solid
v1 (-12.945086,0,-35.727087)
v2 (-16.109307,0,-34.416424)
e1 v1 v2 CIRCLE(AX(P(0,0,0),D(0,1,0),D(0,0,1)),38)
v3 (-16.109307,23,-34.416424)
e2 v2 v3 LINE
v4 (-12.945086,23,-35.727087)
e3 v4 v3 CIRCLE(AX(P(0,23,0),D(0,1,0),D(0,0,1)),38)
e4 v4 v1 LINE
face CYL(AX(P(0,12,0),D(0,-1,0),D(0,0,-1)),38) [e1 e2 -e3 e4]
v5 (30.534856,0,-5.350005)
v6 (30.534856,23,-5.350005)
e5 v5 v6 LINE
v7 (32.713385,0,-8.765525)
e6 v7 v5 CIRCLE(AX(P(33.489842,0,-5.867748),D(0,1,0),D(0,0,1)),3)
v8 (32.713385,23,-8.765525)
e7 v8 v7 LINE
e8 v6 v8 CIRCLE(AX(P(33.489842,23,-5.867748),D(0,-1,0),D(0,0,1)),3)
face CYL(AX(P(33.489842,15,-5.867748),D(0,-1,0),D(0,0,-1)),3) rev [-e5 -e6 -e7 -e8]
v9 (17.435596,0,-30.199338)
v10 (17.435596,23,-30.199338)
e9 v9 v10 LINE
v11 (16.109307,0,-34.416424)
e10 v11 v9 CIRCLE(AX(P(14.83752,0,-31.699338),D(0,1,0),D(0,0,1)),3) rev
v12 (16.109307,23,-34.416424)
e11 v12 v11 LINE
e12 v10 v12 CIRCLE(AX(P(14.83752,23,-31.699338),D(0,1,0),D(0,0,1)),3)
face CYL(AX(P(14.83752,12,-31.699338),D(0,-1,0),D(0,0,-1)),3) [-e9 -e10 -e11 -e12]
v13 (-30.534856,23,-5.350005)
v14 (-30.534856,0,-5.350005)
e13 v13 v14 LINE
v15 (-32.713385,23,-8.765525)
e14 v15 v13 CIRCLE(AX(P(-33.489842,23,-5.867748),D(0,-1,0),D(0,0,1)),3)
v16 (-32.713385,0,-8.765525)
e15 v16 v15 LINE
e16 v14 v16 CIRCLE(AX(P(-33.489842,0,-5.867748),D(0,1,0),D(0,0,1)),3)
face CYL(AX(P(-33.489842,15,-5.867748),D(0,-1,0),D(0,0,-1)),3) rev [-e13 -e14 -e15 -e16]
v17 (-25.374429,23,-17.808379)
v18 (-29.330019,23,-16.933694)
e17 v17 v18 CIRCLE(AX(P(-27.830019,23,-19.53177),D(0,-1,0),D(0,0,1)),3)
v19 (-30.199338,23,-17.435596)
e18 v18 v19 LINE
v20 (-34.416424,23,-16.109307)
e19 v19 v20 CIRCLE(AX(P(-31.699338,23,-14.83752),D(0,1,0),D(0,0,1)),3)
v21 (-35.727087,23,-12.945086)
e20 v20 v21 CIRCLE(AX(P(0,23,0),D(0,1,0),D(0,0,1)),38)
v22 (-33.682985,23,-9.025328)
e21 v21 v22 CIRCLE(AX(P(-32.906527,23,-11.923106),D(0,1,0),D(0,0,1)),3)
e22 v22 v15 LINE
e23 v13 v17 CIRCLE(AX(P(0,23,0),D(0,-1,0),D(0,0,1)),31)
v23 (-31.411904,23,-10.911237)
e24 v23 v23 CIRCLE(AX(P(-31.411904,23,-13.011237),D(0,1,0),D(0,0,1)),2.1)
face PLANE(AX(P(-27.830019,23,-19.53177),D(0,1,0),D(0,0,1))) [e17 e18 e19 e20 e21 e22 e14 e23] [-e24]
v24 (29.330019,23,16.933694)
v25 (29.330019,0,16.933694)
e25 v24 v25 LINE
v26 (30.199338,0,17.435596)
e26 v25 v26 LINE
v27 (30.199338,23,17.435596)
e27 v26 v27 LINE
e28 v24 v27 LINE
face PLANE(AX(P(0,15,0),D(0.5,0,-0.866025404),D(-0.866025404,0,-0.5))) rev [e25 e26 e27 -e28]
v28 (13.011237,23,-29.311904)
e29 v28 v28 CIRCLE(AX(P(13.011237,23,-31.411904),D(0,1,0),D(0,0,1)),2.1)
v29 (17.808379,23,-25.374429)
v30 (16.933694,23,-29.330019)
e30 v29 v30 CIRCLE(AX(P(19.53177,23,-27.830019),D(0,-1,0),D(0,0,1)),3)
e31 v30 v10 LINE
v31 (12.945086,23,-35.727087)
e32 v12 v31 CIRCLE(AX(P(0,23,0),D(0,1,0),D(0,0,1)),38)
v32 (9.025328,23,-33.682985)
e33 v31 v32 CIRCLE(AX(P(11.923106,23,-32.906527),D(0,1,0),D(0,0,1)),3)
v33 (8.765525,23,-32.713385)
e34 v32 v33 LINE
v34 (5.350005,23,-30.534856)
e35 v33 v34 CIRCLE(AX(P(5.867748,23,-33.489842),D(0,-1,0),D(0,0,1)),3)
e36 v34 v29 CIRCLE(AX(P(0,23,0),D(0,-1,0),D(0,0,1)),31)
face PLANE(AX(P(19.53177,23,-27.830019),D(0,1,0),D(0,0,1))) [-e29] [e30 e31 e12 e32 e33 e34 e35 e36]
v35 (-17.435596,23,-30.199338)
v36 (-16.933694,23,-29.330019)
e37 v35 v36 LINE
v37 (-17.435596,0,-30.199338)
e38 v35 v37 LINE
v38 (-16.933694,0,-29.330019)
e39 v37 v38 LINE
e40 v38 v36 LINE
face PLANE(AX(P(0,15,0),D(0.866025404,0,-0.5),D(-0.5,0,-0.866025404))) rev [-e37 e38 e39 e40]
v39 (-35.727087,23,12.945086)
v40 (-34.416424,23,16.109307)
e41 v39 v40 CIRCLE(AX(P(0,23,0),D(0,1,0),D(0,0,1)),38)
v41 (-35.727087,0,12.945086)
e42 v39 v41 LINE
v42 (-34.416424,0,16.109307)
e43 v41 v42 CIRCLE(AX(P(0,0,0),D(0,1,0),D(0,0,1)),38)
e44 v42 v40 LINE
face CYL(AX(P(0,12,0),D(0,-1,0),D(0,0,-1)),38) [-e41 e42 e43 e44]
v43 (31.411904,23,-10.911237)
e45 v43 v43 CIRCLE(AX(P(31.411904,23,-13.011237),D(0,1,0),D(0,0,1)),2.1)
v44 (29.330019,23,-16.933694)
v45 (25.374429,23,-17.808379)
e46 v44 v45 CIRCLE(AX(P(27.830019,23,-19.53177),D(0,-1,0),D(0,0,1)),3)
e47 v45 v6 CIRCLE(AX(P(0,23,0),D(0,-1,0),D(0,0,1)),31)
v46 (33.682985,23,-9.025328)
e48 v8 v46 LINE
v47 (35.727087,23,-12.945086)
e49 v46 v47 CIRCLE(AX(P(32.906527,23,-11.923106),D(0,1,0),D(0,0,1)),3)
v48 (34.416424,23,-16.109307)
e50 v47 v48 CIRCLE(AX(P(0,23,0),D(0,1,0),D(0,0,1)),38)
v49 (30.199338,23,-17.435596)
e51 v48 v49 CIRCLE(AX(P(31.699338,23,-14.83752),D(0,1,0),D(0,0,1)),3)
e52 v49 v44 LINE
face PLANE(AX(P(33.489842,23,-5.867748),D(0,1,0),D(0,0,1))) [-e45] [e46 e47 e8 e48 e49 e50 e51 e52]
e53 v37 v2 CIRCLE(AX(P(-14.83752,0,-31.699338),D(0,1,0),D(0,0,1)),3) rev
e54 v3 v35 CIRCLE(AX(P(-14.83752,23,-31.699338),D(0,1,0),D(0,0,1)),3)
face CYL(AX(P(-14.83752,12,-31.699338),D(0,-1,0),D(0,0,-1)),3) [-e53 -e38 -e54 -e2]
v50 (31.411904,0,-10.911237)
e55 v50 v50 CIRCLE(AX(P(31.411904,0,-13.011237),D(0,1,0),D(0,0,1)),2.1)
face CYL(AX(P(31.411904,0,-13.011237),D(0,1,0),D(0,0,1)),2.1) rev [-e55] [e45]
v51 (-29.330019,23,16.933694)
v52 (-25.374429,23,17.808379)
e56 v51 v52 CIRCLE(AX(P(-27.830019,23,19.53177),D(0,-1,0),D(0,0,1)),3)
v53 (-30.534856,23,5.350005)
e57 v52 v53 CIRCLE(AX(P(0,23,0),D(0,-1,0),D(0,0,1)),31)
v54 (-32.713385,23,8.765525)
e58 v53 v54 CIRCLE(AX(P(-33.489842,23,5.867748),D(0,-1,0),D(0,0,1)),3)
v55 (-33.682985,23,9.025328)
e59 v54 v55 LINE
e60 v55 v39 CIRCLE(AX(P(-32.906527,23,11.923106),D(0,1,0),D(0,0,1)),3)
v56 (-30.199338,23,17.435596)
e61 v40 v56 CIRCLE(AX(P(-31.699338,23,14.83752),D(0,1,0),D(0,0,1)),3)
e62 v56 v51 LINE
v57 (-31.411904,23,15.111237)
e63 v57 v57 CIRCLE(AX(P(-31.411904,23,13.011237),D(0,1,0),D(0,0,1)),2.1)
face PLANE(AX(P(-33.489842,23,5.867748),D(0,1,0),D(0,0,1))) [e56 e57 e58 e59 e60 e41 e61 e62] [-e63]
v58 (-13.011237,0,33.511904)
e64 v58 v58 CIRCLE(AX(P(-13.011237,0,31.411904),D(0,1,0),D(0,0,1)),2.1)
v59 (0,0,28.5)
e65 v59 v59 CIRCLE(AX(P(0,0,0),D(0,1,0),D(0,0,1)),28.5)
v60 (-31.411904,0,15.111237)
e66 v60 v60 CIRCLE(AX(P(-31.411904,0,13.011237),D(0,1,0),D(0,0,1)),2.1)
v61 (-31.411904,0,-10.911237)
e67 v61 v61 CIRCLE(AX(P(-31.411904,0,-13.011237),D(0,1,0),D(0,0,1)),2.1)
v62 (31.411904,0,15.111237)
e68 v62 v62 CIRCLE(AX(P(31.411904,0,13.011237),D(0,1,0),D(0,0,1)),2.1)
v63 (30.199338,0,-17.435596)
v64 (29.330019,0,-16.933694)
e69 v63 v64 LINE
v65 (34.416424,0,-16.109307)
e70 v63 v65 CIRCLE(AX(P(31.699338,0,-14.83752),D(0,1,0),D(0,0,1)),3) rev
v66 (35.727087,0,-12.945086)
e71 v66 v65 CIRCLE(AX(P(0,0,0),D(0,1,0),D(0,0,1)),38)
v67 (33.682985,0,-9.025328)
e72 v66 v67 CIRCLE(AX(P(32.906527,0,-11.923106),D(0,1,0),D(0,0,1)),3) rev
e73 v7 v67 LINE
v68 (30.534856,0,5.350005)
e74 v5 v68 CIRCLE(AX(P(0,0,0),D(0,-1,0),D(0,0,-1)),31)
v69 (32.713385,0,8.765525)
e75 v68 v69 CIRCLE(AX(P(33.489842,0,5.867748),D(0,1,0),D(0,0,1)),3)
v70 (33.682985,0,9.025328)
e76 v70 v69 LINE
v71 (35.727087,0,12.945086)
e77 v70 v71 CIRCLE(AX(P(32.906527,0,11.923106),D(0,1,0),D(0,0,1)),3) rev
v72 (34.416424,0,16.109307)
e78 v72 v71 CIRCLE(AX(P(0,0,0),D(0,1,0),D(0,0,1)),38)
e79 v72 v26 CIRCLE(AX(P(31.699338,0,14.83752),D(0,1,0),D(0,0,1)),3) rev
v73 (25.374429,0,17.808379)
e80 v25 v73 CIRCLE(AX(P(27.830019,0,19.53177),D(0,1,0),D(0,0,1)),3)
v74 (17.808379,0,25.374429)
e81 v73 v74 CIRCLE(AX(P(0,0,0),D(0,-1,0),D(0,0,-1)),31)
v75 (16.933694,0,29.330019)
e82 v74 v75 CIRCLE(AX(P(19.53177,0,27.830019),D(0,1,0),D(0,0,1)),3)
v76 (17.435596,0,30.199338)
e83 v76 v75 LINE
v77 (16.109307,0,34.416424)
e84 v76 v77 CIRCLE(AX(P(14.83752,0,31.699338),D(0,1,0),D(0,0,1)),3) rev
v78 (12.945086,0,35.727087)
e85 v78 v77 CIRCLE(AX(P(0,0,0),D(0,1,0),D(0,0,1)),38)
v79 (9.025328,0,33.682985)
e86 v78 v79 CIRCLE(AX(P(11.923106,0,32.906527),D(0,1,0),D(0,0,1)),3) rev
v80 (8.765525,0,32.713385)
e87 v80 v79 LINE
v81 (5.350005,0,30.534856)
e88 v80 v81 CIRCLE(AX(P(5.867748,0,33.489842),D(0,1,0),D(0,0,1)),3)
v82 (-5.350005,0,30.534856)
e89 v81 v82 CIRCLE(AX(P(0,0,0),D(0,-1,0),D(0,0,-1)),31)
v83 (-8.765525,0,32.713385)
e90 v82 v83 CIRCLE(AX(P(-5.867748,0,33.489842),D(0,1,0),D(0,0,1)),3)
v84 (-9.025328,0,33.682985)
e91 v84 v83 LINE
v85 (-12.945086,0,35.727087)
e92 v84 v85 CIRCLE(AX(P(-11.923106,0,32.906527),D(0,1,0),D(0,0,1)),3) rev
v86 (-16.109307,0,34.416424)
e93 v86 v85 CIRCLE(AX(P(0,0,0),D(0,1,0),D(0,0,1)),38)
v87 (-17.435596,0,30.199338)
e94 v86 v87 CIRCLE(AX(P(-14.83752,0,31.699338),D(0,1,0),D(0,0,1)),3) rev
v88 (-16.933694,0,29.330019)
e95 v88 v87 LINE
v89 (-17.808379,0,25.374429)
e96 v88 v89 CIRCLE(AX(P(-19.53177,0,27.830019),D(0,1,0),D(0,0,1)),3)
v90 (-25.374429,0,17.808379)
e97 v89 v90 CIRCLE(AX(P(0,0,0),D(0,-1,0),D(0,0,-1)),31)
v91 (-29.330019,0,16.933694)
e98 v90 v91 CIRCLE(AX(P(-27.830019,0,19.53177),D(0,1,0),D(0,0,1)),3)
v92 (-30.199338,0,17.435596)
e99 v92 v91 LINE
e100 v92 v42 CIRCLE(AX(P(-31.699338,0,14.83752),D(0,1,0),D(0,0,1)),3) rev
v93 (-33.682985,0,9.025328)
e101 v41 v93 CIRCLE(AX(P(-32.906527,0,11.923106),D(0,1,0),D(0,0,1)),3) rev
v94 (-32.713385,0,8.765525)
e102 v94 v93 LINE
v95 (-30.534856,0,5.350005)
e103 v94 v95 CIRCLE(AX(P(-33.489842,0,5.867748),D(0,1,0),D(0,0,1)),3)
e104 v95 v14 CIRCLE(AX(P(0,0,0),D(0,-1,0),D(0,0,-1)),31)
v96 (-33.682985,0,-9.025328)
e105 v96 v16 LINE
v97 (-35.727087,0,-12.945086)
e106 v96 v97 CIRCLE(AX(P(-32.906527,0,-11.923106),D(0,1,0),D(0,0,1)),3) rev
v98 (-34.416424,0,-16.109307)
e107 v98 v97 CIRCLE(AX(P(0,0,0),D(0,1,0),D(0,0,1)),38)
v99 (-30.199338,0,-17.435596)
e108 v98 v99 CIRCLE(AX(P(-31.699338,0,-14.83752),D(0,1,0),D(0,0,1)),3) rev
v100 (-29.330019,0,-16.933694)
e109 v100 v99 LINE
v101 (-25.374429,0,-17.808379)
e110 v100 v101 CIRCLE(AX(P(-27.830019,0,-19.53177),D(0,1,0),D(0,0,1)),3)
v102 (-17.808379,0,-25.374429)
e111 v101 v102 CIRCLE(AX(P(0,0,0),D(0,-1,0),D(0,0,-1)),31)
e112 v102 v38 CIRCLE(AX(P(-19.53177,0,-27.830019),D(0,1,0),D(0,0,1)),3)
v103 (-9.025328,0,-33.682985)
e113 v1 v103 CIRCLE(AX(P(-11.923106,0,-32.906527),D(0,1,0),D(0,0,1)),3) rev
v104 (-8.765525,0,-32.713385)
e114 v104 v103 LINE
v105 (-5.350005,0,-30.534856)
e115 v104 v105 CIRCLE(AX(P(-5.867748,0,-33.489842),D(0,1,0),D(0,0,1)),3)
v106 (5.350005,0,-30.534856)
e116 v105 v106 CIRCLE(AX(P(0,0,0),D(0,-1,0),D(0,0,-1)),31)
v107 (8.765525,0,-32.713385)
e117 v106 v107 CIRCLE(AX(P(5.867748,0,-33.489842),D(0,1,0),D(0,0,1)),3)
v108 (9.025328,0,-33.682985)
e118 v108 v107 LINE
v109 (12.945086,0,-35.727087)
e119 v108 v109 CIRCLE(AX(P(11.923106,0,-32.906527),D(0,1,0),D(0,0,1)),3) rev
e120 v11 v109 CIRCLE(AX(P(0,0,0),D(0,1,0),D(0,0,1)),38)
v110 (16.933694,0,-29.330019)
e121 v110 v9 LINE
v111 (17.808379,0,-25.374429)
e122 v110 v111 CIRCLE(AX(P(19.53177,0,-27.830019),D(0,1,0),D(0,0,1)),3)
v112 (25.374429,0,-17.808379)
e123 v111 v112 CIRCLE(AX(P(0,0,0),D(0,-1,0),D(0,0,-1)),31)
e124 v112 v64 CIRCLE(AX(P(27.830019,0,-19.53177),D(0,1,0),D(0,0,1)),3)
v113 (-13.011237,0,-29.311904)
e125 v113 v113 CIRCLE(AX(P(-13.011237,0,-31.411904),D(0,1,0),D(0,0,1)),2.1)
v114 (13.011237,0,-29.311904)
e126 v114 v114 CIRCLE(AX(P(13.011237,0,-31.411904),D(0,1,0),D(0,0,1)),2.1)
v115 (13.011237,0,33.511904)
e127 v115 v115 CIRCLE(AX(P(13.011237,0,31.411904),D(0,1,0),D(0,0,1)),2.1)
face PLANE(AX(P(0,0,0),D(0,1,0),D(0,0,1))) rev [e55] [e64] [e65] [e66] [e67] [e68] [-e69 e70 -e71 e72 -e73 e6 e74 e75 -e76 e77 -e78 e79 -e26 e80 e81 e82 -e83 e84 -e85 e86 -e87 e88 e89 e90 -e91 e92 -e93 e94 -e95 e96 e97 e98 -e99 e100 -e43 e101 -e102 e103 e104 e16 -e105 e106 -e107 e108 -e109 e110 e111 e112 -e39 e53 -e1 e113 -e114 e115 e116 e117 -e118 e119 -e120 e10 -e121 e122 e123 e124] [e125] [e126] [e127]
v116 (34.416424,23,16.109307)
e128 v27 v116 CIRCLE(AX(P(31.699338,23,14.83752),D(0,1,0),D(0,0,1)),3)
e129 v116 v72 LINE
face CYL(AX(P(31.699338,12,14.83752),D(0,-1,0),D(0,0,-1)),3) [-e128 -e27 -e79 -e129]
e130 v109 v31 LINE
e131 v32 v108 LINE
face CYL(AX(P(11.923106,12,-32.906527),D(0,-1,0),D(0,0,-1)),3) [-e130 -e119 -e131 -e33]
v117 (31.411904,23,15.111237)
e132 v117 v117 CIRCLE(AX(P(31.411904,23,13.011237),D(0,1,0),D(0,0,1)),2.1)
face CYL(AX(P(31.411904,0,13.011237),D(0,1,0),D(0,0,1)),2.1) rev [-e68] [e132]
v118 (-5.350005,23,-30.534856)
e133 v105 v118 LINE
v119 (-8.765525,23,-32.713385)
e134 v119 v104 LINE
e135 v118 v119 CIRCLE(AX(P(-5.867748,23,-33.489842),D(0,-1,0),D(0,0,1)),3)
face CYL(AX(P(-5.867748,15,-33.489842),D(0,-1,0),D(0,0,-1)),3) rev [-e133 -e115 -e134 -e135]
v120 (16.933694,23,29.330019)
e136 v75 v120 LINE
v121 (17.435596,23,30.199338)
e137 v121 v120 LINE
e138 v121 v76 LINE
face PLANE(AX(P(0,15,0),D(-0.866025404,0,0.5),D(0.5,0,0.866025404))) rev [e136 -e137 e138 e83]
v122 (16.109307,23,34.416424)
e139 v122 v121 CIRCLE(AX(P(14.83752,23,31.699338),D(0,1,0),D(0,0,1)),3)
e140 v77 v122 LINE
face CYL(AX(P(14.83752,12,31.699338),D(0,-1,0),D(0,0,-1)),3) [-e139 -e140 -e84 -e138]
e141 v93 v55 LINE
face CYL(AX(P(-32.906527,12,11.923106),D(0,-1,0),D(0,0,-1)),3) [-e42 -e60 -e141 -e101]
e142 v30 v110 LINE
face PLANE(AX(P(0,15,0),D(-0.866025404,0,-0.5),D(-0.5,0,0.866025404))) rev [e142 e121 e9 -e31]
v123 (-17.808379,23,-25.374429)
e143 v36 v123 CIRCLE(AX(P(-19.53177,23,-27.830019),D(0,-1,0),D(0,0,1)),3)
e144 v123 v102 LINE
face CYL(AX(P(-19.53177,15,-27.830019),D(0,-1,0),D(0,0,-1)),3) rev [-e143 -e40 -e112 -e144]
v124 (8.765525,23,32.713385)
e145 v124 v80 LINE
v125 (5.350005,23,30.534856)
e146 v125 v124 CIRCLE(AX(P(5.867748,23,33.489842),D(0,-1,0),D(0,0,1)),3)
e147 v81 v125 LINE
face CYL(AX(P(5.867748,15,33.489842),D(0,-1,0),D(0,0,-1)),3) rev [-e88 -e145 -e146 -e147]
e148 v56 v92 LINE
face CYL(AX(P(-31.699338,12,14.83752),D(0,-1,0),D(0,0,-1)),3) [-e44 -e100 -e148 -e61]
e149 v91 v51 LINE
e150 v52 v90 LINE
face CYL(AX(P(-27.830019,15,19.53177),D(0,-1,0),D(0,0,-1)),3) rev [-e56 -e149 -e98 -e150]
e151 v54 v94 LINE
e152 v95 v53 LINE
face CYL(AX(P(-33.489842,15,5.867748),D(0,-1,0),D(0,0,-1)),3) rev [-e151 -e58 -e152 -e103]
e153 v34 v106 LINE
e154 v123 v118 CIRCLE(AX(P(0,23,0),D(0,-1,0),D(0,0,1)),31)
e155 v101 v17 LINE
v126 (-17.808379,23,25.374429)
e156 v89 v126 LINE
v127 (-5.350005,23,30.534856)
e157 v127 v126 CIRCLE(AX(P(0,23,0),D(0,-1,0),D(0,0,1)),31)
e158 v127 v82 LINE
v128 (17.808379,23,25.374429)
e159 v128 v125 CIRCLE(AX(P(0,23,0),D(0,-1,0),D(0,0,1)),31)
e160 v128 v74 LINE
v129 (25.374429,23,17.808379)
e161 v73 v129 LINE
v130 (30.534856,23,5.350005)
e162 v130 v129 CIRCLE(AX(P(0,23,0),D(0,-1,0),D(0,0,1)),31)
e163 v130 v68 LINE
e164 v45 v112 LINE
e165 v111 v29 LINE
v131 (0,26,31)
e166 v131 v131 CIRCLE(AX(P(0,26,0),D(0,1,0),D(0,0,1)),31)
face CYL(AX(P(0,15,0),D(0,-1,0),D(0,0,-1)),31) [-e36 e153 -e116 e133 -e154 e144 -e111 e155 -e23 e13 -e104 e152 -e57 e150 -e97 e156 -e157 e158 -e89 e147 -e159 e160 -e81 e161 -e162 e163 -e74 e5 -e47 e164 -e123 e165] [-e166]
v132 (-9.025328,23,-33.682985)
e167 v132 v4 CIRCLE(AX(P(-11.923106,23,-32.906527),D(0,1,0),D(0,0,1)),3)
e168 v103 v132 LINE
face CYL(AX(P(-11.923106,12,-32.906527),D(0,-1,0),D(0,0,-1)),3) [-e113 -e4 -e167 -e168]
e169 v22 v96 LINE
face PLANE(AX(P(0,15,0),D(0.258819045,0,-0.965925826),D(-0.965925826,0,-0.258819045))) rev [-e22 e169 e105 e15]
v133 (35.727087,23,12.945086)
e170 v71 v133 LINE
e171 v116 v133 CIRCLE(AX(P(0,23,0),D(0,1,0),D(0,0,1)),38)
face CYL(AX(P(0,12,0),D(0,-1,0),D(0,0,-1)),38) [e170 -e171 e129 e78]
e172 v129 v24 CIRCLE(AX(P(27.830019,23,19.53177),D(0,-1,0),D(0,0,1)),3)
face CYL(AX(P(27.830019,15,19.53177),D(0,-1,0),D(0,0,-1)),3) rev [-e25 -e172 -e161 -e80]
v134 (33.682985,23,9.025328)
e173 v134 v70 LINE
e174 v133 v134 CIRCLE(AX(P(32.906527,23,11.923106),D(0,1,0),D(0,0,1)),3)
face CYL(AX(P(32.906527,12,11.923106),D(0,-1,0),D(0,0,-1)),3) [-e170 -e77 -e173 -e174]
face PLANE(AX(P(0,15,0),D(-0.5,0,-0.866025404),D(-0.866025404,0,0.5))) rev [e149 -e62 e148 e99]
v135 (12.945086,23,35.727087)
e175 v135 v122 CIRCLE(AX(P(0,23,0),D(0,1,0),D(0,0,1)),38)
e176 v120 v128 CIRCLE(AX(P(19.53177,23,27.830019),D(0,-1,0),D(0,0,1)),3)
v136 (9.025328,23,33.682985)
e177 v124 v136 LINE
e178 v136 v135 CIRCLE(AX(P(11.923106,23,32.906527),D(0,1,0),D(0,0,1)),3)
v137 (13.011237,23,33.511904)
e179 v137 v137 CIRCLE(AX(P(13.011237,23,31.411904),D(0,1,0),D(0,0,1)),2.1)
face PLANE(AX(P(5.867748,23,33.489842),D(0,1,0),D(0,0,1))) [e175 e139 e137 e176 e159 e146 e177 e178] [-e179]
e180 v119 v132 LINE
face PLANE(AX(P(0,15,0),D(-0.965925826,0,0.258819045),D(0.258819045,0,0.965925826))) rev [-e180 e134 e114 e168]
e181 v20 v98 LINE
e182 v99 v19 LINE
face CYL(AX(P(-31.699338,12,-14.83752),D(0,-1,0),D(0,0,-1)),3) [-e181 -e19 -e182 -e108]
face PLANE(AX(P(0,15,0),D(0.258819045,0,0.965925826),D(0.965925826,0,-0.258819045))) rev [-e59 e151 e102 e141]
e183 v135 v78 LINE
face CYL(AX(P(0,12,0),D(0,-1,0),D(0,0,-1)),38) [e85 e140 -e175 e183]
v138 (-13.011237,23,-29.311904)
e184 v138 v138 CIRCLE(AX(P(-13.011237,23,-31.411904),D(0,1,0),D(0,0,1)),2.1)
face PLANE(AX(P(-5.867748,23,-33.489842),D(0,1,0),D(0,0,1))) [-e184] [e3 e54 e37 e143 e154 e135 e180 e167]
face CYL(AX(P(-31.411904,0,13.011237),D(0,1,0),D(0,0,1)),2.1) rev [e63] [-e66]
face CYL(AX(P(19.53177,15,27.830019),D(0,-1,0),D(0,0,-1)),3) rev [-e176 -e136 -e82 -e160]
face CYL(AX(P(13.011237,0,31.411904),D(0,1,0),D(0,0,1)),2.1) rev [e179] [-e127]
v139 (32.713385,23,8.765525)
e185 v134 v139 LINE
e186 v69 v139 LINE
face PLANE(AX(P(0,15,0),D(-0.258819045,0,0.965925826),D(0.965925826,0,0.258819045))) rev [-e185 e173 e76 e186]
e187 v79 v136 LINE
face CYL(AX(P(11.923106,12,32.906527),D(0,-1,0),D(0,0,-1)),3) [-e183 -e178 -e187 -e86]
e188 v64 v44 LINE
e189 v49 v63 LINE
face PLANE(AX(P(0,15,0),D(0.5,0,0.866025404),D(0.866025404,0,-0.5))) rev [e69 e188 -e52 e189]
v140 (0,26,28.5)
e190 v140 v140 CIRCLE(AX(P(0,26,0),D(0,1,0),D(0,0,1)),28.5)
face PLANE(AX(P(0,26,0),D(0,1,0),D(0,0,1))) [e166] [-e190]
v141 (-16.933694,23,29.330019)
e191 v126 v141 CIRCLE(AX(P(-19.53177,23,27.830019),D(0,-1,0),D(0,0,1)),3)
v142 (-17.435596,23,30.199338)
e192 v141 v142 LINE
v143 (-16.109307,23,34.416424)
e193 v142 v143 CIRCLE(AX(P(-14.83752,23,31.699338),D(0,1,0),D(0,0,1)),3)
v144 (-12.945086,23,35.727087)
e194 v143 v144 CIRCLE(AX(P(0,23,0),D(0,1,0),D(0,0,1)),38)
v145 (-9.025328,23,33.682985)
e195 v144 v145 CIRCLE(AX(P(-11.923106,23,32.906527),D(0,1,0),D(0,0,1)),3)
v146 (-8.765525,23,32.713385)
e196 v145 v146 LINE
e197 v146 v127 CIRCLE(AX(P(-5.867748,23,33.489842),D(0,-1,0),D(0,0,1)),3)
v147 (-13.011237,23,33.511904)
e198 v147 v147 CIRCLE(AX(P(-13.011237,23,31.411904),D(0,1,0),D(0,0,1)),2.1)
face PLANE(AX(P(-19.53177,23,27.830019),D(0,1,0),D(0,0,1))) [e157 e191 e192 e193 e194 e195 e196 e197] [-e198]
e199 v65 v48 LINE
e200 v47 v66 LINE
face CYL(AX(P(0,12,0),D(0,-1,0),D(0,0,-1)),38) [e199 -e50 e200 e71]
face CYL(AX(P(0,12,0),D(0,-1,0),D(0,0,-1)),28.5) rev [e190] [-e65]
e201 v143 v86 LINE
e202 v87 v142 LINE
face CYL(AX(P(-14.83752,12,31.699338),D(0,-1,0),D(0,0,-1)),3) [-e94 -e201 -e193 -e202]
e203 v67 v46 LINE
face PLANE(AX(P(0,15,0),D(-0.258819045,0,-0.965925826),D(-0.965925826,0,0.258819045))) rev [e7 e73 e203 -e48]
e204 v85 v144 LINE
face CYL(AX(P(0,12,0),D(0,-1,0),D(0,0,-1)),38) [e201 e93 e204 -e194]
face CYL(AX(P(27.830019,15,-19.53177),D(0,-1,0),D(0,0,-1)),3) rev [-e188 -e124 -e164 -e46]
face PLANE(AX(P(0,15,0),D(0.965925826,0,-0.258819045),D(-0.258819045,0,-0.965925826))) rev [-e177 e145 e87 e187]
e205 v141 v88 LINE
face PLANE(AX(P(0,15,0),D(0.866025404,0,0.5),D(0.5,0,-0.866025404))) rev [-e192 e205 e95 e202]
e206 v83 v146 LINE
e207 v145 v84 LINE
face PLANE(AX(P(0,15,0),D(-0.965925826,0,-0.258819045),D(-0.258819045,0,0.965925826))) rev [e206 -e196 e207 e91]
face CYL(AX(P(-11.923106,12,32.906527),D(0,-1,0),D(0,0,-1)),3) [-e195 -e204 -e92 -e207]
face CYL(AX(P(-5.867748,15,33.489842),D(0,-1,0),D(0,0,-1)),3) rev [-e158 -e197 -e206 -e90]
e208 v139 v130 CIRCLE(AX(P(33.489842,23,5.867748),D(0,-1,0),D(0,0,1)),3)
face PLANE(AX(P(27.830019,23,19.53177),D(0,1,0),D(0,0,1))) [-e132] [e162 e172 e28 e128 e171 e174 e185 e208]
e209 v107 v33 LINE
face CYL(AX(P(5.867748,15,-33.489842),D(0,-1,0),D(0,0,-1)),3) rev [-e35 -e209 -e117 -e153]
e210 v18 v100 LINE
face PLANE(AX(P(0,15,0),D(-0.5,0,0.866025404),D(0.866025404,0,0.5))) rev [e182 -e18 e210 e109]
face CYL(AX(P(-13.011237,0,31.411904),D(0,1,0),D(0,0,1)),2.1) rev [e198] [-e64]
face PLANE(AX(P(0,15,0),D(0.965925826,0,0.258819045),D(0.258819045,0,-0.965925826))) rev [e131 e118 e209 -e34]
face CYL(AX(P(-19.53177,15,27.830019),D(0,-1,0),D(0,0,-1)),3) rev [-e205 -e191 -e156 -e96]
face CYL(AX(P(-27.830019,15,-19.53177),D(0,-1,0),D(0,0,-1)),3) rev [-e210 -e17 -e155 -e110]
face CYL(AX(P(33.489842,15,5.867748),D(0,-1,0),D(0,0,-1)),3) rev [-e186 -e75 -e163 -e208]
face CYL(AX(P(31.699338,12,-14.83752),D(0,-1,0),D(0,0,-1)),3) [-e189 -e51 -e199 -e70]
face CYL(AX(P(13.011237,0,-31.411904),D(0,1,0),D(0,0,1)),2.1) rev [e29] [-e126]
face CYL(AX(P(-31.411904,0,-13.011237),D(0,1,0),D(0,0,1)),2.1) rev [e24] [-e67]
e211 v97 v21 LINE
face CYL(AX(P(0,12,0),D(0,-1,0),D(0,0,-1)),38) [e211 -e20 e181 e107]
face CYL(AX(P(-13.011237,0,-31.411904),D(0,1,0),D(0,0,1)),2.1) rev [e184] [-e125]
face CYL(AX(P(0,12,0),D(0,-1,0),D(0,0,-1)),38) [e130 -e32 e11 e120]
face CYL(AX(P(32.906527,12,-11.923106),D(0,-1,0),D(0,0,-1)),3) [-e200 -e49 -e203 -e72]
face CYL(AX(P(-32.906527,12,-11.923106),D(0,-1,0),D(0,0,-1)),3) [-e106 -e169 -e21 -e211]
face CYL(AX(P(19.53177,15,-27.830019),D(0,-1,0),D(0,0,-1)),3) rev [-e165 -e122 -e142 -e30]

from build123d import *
from build123d.topology import SkipClean

# Parameters (mm, degrees)
SKETCH_1_R          = 38
SKETCH_1_R_2        = 28.5
EXTRUDE_1_DEPTH     = 12
SKETCH_2_R          = 2.1
CUT_EXTRUDE_1_DEPTH = 56.063599592
SKETCH_4_R          = 31
SKETCH_4_R_2        = 28.5
EXTRUDE_2_DEPTH     = 3
CUT_EXTRUDE_2_DEPTH = 56.794264938
FILLET_1_R          = 3
EXTRUDE_3_DEPTH     = 11
SKETCH_7_R          = 28.5
EXTRUDE_4_DEPTH     = 11
SKETCH_8_R          = 2.1
CUT_EXTRUDE_3_DEPTH = 58.048728436


with BuildPart() as part:
    # 草图1 → 凸台-拉伸1 (new body)
    with BuildSketch(Plane(origin=(0, 0, 0), x_dir=(1, 0, 0), z_dir=(0, 1, 0))):
        with Locations(Location((0, 0, 0), (0, 0, 270))):
            Circle(SKETCH_1_R)
        with Locations(Location((0, 0, 0), (0, 0, 270))):
            Circle(SKETCH_1_R_2, mode=Mode.SUBTRACT)
    extrude(amount=EXTRUDE_1_DEPTH)

    # 草图2 → 切除-拉伸1 (cut, through all)
    with BuildSketch(Plane(origin=(0, 12, 0), x_dir=(1, 0, 0), z_dir=(0, 1, 0))):
        with Locations(Location((13.0112367, 31.411904105, 0), (0, 0, 270))):
            Circle(SKETCH_2_R)
        with Locations(Location((31.411904105, 13.0112367, 0), (0, 0, 270))):
            Circle(SKETCH_2_R)
        with Locations(Location((31.411904105, -13.0112367, 0), (0, 0, 270))):
            Circle(SKETCH_2_R)
        with Locations(Location((13.0112367, -31.411904105, 0), (0, 0, 270))):
            Circle(SKETCH_2_R)
        with Locations(Location((-13.0112367, -31.411904105, 0), (0, 0, 270))):
            Circle(SKETCH_2_R)
        with Locations(Location((-31.411904105, -13.0112367, 0), (0, 0, 270))):
            Circle(SKETCH_2_R)
        with Locations(Location((-31.411904105, 13.0112367, 0), (0, 0, 270))):
            Circle(SKETCH_2_R)
        with Locations(Location((-13.0112367, 31.411904105, 0), (0, 0, 270))):
            Circle(SKETCH_2_R)
    extrude(amount=-CUT_EXTRUDE_1_DEPTH, mode=Mode.SUBTRACT)

    # 草图4 → 凸台-拉伸2 (add)
    with BuildSketch(Plane(origin=(0, 12, 0), x_dir=(1, 0, 0), z_dir=(0, 1, 0))):
        with Locations(Location((0, 0, 0), (0, 0, 270))):
            Circle(SKETCH_4_R)
        with Locations(Location((0, 0, 0), (0, 0, 270))):
            Circle(SKETCH_4_R_2, mode=Mode.SUBTRACT)
    extrude(amount=EXTRUDE_2_DEPTH)

    # 草图5 → 切除-拉伸2 (cut, through all)
    with BuildSketch(Plane.XZ):
        with BuildLine():
            ThreePointArc((31, 0), (30.734790703, -4.046311959), (29.943700615, -8.023390398))
            Line((29.943700615, -8.023390398), (36.705181399, -9.835123714))
            ThreePointArc((36.705181399, -9.835123714), (37.674904732, -4.959995304), (38, 0))
            ThreePointArc((38, 0), (37.674904732, 4.959995304), (36.705181399, 9.835123714))
            Line((36.705181399, 9.835123714), (29.943700615, 8.023390398))
            ThreePointArc((29.943700615, 8.023390398), (30.734790703, 4.046311959), (31, 0))
        make_face()
        with BuildLine():
            ThreePointArc((15.5, 26.846787517), (21.920310217, 21.920310217), (26.846787517, 15.5))
            Line((26.846787517, 15.5), (32.908965344, 19))
            ThreePointArc((32.908965344, 19), (26.870057685, 26.870057685), (19, 32.908965344))
            Line((19, 32.908965344), (15.5, 26.846787517))
        make_face()
        with BuildLine():
            ThreePointArc((0, 38), (-4.959995304, 37.674904732), (-9.835123714, 36.705181399))
            Line((-9.835123714, 36.705181399), (-8.023390398, 29.943700615))
            ThreePointArc((-8.023390398, 29.943700615), (-4.046311959, 30.734790703), (0, 31))
            Line((0, 31), (0, 38))
        make_face()
        with BuildLine():
            ThreePointArc((9.835123714, 36.705181399), (4.959995304, 37.674904732), (0, 38))
            Line((0, 38), (0, 31))
            ThreePointArc((0, 31), (4.046311959, 30.734790703), (8.023390398, 29.943700615))
            Line((8.023390398, 29.943700615), (9.835123714, 36.705181399))
        make_face()
        with BuildLine():
            Line((-15.5, 26.846787517), (-19, 32.908965344))
            ThreePointArc((-19, 32.908965344), (-26.870057685, 26.870057685), (-32.908965344, 19))
            Line((-32.908965344, 19), (-26.846787517, 15.5))
            ThreePointArc((-26.846787517, 15.5), (-21.920310217, 21.920310217), (-15.5, 26.846787517))
        make_face()
        with BuildLine():
            ThreePointArc((-29.943700615, -8.023390398), (-31, 0), (-29.943700615, 8.023390398))
            Line((-29.943700615, 8.023390398), (-36.705181399, 9.835123714))
            ThreePointArc((-36.705181399, 9.835123714), (-38, 0), (-36.705181399, -9.835123714))
            Line((-36.705181399, -9.835123714), (-29.943700615, -8.023390398))
        make_face()
        with BuildLine():
            ThreePointArc((-15.5, -26.846787517), (-21.920310217, -21.920310217), (-26.846787517, -15.5))
            Line((-26.846787517, -15.5), (-32.908965344, -19))
            ThreePointArc((-32.908965344, -19), (-26.870057685, -26.870057685), (-19, -32.908965344))
            Line((-19, -32.908965344), (-15.5, -26.846787517))
        make_face()
        with BuildLine():
            ThreePointArc((8.023390398, -29.943700615), (0, -31), (-8.023390398, -29.943700615))
            Line((-8.023390398, -29.943700615), (-9.835123714, -36.705181399))
            ThreePointArc((-9.835123714, -36.705181399), (0, -38), (9.835123714, -36.705181399))
            Line((9.835123714, -36.705181399), (8.023390398, -29.943700615))
        make_face()
        with BuildLine():
            ThreePointArc((26.846787517, -15.5), (21.920310217, -21.920310217), (15.5, -26.846787517))
            Line((15.5, -26.846787517), (19, -32.908965344))
            ThreePointArc((19, -32.908965344), (26.870057685, -26.870057685), (32.908965344, -19))
            Line((32.908965344, -19), (26.846787517, -15.5))
        make_face()
    extrude(amount=-CUT_EXTRUDE_2_DEPTH, mode=Mode.SUBTRACT)

    # 圆角1
    # the kernel refuses this fillet: 3 mm, written as the material it adds along each edge
    with BuildSketch(Plane(origin=(15.5, 0, -26.846787517), x_dir=(0.8431001790533391, 0, 0.5377565323454729), z_dir=(0, 1, 0)), Plane(origin=(-8.023390398, 0, -29.943700615), x_dir=(0.9764131444770549, 0, -0.21591056317936408), z_dir=(0, 1, 0)), Plane(origin=(-26.846787517, 0, -15.5), x_dir=(0.5377565323455356, 0, -0.8431001790532991), z_dir=(0, 1, 0)), Plane(origin=(-29.943700615, 0, 8.023390398), x_dir=(-0.21591056317914886, 0, -0.9764131444771023), z_dir=(0, 1, 0)), Plane(origin=(-15.5, 0, 26.846787517), x_dir=(-0.843100179053171, 0, -0.5377565323457362), z_dir=(0, 1, 0)), Plane(origin=(26.846787517, 0, 15.5), x_dir=(-0.5377565323456782, 0, 0.8431001790532081), z_dir=(0, 1, 0)), Plane(origin=(29.943700615, 0, -8.023390398), x_dir=(0.21591056317925006, 0, 0.97641314447708), z_dir=(0, 1, 0))) as fillet_1_piece_1:
        with BuildLine():
            CenterArc((2.870447355, 2.997073318), FILLET_1_R, 182.531046482, 84.937907036)
            Line((-0.126625963, 2.864591132), (0, 0))
            ThreePointArc((0, 0), (1.368982585, 0.030242386), (2.737965169, 0))
        make_face()
    extrude(amount=12)
    with BuildSketch(Plane(origin=(26.846787517, 0, -15.5), x_dir=(-0.5377565323455209, 0, -0.8431001790533084), z_dir=(0, 1, 0)), Plane(origin=(-8.023390398, 0, 29.943700615), x_dir=(0.9764131444771329, 0, 0.21591056317901047), z_dir=(0, 1, 0)), Plane(origin=(15.5, 0, 26.846787517), x_dir=(0.8431001790531747, 0, -0.5377565323457305), z_dir=(0, 1, 0)), Plane(origin=(29.943700615, 0, 8.023390398), x_dir=(0.2159105631791721, 0, -0.9764131444770973), z_dir=(0, 1, 0))) as fillet_1_piece_2:
        with BuildLine():
            CenterArc((2.870447355, -2.997073318), FILLET_1_R, 92.531046482, 84.937907036)
            Line((-0.126625963, -2.864591132), (0, 0))
            ThreePointArc((0, 0), (1.368982585, -0.030242386), (2.737965169, 0))
        make_face()
    extrude(amount=12)
    with BuildSketch(Plane(origin=(8.023390398, 0, -29.943700615), x_dir=(0.2588190451024918, 0, -0.9659258262890761), z_dir=(0, 1, 0)), Plane(origin=(-15.5, 0, -26.846787517), x_dir=(-0.5000000000001898, 0, -0.866025403784329), z_dir=(0, 1, 0)), Plane(origin=(-29.943700615, 0, -8.023390398), x_dir=(-0.9659258262890777, 0, -0.25881904510248516), z_dir=(0, 1, 0)), Plane(origin=(-26.846787517, 0, 15.5), x_dir=(-0.8660254037843256, 0, 0.5000000000001957), z_dir=(0, 1, 0))) as fillet_1_piece_3:
        with BuildLine():
            CenterArc((2.867388444, 3), FILLET_1_R, 185.062092964, 84.937907036)
            ThreePointArc((-0.120910537, 2.735294118), (-0.030242386, 1.368982585), (0, 0))
            Line((0, 0), (2.867388444, 0))
        make_face()
    extrude(amount=12)
    with BuildSketch(Plane(origin=(8.023390398, 0, 29.943700615), x_dir=(0.25881904510250275, 0, 0.9659258262890731), z_dir=(0, 1, 0))) as fillet_1_piece_4:
        with BuildLine():
            CenterArc((2.867388444, -3), FILLET_1_R, 90, 84.937907036)
            ThreePointArc((-0.120910537, -2.735294118), (-0.030242386, -1.368982585), (0, 0))
            Line((0, 0), (2.867388444, 0))
        make_face()
    extrude(amount=12)
    # the kernel refuses this fillet: 3 mm, written as the material it takes off along each edge
    with BuildSketch(Plane(origin=(32.908965344, -8.150359418, -19), x_dir=(0.4623901879594874, 0, 0.8866765555030706), z_dir=(0, 1, 0)), Plane(origin=(9.835123714, -8.150359418, -36.705181399), x_dir=(0.9539342425756279, 0, 0.30001576765507343), z_dir=(0, 1, 0)), Plane(origin=(-19, -8.150359418, -32.908965344), x_dir=(0.8866765555030693, 0, -0.46239018795949005), z_dir=(0, 1, 0)), Plane(origin=(-36.705181399, -8.150359418, -9.835123714), x_dir=(0.30001576765507165, 0, -0.9539342425756285), z_dir=(0, 1, 0)), Plane(origin=(-32.908965344, -8.150359418, 19), x_dir=(-0.4623901879594926, 0, -0.8866765555030679), z_dir=(0, 1, 0)), Plane(origin=(-9.835123714, -8.150359418, 36.705181399), x_dir=(-0.9539342425756258, 0, -0.30001576765508037), z_dir=(0, 1, 0)), Plane(origin=(19, -8.150359418, 32.908965344), x_dir=(-0.886676555503072, 0, 0.46239018795948483), z_dir=(0, 1, 0)), Plane(origin=(36.705181399, -8.150359418, 9.835123714), x_dir=(-0.30001576765507776, 0, 0.9539342425756266), z_dir=(0, 1, 0))) as fillet_1_2_piece_1:
        with BuildLine():
            CenterArc((3.131453882, -2.997238548), FILLET_1_R, 87.541449832, 94.917100336)
            Line((0.134215334, -3.125928434), (0, 0))
            ThreePointArc((0, 0), (1.630071884, 0.034978393), (3.260143767, 0))
        make_face()
    extrude(amount=28.300718837, mode=Mode.SUBTRACT)
    with BuildSketch(Plane(origin=(19, -8.150359418, -32.908965344), x_dir=(-0.49999999999999534, 0, 0.8660254037844413), z_dir=(0, 1, 0)), Plane(origin=(-9.835123714, -8.150359418, -36.705181399), x_dir=(0.2588190451025281, 0, 0.9659258262890663), z_dir=(0, 1, 0)), Plane(origin=(-32.908965344, -8.150359418, -19), x_dir=(0.8660254037844429, 0, 0.4999999999999924), z_dir=(0, 1, 0)), Plane(origin=(-36.705181399, -8.150359418, 9.835123714), x_dir=(0.9659258262890654, 0, -0.2588190451025314), z_dir=(0, 1, 0)), Plane(origin=(-19, -8.150359418, 32.908965344), x_dir=(0.49999999999998923, 0, -0.8660254037844448), z_dir=(0, 1, 0)), Plane(origin=(32.908965344, -8.150359418, 19), x_dir=(-0.8660254037844397, 0, -0.499999999999998), z_dir=(0, 1, 0)), Plane(origin=(36.705181399, -8.150359418, -9.835123714), x_dir=(-0.9659258262890671, 0, 0.25881904510252496), z_dir=(0, 1, 0))) as fillet_1_2_piece_2:
        with BuildLine():
            CenterArc((3.128808452, -3), FILLET_1_R, 90, 94.917100336)
            ThreePointArc((0.139849176, -3.257142857), (0.034978393, -1.630071884), (0, 0))
            Line((0, 0), (3.128808452, 0))
        make_face()
    extrude(amount=28.300718837, mode=Mode.SUBTRACT)
    with BuildSketch(Plane(origin=(9.835123714, -8.150359418, 36.705181399), x_dir=(0.9539342425756233, 0, -0.30001576765508847), z_dir=(0, 1, 0))) as fillet_1_2_piece_3:
        with BuildLine():
            CenterArc((3.131453882, 2.997238548), FILLET_1_R, 177.541449832, 94.917100336)
            Line((0.134215334, 3.125928434), (0, 0))
            ThreePointArc((0, 0), (1.630071884, -0.034978393), (3.260143767, 0))
        make_face()
    extrude(amount=28.300718837, mode=Mode.SUBTRACT)

    # 草图6 → 凸台-拉伸3 (add)
    with SkipClean():  # the faces are left unmerged after this step: merging them gives an invalid solid
        with BuildSketch(Plane(origin=(0, 12, 0), x_dir=(1, 0, 0), z_dir=(0, 1, 0))):
            with BuildLine():
                Line((-16.933694222, -29.330018752), (-17.435595774, -30.199337741))
                ThreePointArc((-17.435595774, -30.199337741), (-17.699322291, -32.599385044), (-16.109306954, -34.416423833))
                ThreePointArc((-16.109306954, -34.416423833), (-14.54197043, -35.107422235), (-12.945086489, -35.727086864))
                ThreePointArc((-12.945086489, -35.727086864), (-10.535935413, -35.566557041), (-9.025328498, -33.68298451))
                Line((-9.025328498, -33.68298451), (-8.765525137, -32.713385167))
                ThreePointArc((-8.765525137, -32.713385167), (-7.481017255, -30.960541765), (-5.350005218, -30.534856217))
                ThreePointArc((-5.350005218, -30.534856217), (-11.863186403, -28.640265508), (-17.808378924, -25.374428862))
                ThreePointArc((-17.808378924, -25.374428862), (-16.602531, -27.182287063), (-16.933694222, -29.330018752))
            make_face()
            with BuildLine():
                Line((-32.713385167, -8.765525137), (-33.68298451, -9.025328498))
                ThreePointArc((-33.68298451, -9.025328498), (-35.566557041, -10.535935413), (-35.727086864, -12.945086489))
                ThreePointArc((-35.727086864, -12.945086489), (-35.107422235, -14.54197043), (-34.416423833, -16.109306954))
                ThreePointArc((-34.416423833, -16.109306954), (-32.599385044, -17.699322291), (-30.199337741, -17.435595774))
                Line((-30.199337741, -17.435595774), (-29.330018752, -16.933694222))
                ThreePointArc((-29.330018752, -16.933694222), (-27.182287063, -16.602531), (-25.374428862, -17.808378924))
                ThreePointArc((-25.374428862, -17.808378924), (-28.640265508, -11.863186403), (-30.534856217, -5.350005218))
                ThreePointArc((-30.534856217, -5.350005218), (-30.960541765, -7.481017255), (-32.713385167, -8.765525137))
            make_face()
            with BuildLine():
                Line((-29.330018752, 16.933694222), (-30.199337741, 17.435595774))
                ThreePointArc((-30.199337741, 17.435595774), (-32.599385044, 17.699322291), (-34.416423833, 16.109306954))
                ThreePointArc((-34.416423833, 16.109306954), (-35.107422235, 14.54197043), (-35.727086864, 12.945086489))
                ThreePointArc((-35.727086864, 12.945086489), (-35.566557041, 10.535935413), (-33.68298451, 9.025328498))
                Line((-33.68298451, 9.025328498), (-32.713385167, 8.765525137))
                ThreePointArc((-32.713385167, 8.765525137), (-30.960541765, 7.481017255), (-30.534856217, 5.350005218))
                ThreePointArc((-30.534856217, 5.350005218), (-28.640265508, 11.863186403), (-25.374428862, 17.808378924))
                ThreePointArc((-25.374428862, 17.808378924), (-27.182287063, 16.602531), (-29.330018752, 16.933694222))
            make_face()
            with BuildLine():
                Line((-8.765525137, 32.713385167), (-9.025328498, 33.68298451))
                ThreePointArc((-9.025328498, 33.68298451), (-10.535935413, 35.566557041), (-12.945086489, 35.727086864))
                ThreePointArc((-12.945086489, 35.727086864), (-14.54197043, 35.107422235), (-16.109306954, 34.416423833))
                ThreePointArc((-16.109306954, 34.416423833), (-17.699322291, 32.599385044), (-17.435595774, 30.199337741))
                Line((-17.435595774, 30.199337741), (-16.933694222, 29.330018752))
                ThreePointArc((-16.933694222, 29.330018752), (-16.602531, 27.182287063), (-17.808378924, 25.374428862))
                ThreePointArc((-17.808378924, 25.374428862), (-11.863186403, 28.640265508), (-5.350005218, 30.534856217))
                ThreePointArc((-5.350005218, 30.534856217), (-7.481017255, 30.960541765), (-8.765525137, 32.713385167))
            make_face()
            with BuildLine():
                Line((16.933694222, 29.330018752), (17.435595774, 30.199337741))
                ThreePointArc((17.435595774, 30.199337741), (17.699322291, 32.599385044), (16.109306954, 34.416423833))
                ThreePointArc((16.109306954, 34.416423833), (14.54197043, 35.107422235), (12.945086489, 35.727086864))
                ThreePointArc((12.945086489, 35.727086864), (10.535935413, 35.566557041), (9.025328498, 33.68298451))
                Line((9.025328498, 33.68298451), (8.765525137, 32.713385167))
                ThreePointArc((8.765525137, 32.713385167), (7.481017255, 30.960541765), (5.350005218, 30.534856217))
                ThreePointArc((5.350005218, 30.534856217), (11.863186403, 28.640265508), (17.808378924, 25.374428862))
                ThreePointArc((17.808378924, 25.374428862), (16.602531, 27.182287063), (16.933694222, 29.330018752))
            make_face()
            with BuildLine():
                Line((32.713385167, 8.765525137), (33.68298451, 9.025328498))
                ThreePointArc((33.68298451, 9.025328498), (35.566557041, 10.535935413), (35.727086864, 12.945086489))
                ThreePointArc((35.727086864, 12.945086489), (35.107422235, 14.54197043), (34.416423833, 16.109306954))
                ThreePointArc((34.416423833, 16.109306954), (32.599385044, 17.699322291), (30.199337741, 17.435595774))
                Line((30.199337741, 17.435595774), (29.330018752, 16.933694222))
                ThreePointArc((29.330018752, 16.933694222), (27.182287063, 16.602531), (25.374428862, 17.808378924))
                ThreePointArc((25.374428862, 17.808378924), (28.640265508, 11.863186403), (30.534856217, 5.350005218))
                ThreePointArc((30.534856217, 5.350005218), (30.960541765, 7.481017255), (32.713385167, 8.765525137))
            make_face()
            with BuildLine():
                Line((8.765525137, -32.713385167), (9.025328498, -33.68298451))
                ThreePointArc((9.025328498, -33.68298451), (10.535935413, -35.566557041), (12.945086489, -35.727086864))
                ThreePointArc((12.945086489, -35.727086864), (14.54197043, -35.107422235), (16.109306954, -34.416423833))
                ThreePointArc((16.109306954, -34.416423833), (17.699322291, -32.599385044), (17.435595774, -30.199337741))
                Line((17.435595774, -30.199337741), (16.933694222, -29.330018752))
                ThreePointArc((16.933694222, -29.330018752), (16.602531, -27.182287063), (17.808378924, -25.374428862))
                ThreePointArc((17.808378924, -25.374428862), (11.863186403, -28.640265508), (5.350005218, -30.534856217))
                ThreePointArc((5.350005218, -30.534856217), (7.481017255, -30.960541765), (8.765525137, -32.713385167))
            make_face()
            with BuildLine():
                Line((29.330018752, -16.933694222), (30.199337741, -17.435595774))
                ThreePointArc((30.199337741, -17.435595774), (32.599385044, -17.699322291), (34.416423833, -16.109306954))
                ThreePointArc((34.416423833, -16.109306954), (35.107422235, -14.54197043), (35.727086864, -12.945086489))
                ThreePointArc((35.727086864, -12.945086489), (35.566557041, -10.535935413), (33.68298451, -9.025328498))
                Line((33.68298451, -9.025328498), (32.713385167, -8.765525137))
                ThreePointArc((32.713385167, -8.765525137), (30.960541765, -7.481017255), (30.534856217, -5.350005218))
                ThreePointArc((30.534856217, -5.350005218), (28.640265508, -11.863186403), (25.374428862, -17.808378924))
                ThreePointArc((25.374428862, -17.808378924), (27.182287063, -16.602531), (29.330018752, -16.933694222))
            make_face()
        extrude(amount=EXTRUDE_3_DEPTH)

    # 草图7 → 凸台-拉伸4 (add)
    with SkipClean():  # the faces are left unmerged after this step: merging them gives an invalid solid
        with BuildSketch(Plane(origin=(0, 15, 0), x_dir=(1, 0, 0), z_dir=(0, 1, 0))):
            with BuildLine():
                ThreePointArc((5.350005218, -30.534856217), (11.863186403, -28.640265508), (17.808378924, -25.374428862))
                ThreePointArc((17.808378924, -25.374428862), (21.920310217, -21.920310217), (25.374428862, -17.808378924))
                ThreePointArc((25.374428862, -17.808378924), (28.640265508, -11.863186403), (30.534856217, -5.350005218))
                ThreePointArc((30.534856217, -5.350005218), (31, 0), (30.534856217, 5.350005218))
                ThreePointArc((30.534856217, 5.350005218), (28.640265508, 11.863186403), (25.374428862, 17.808378924))
                ThreePointArc((25.374428862, 17.808378924), (21.920310217, 21.920310217), (17.808378924, 25.374428862))
                ThreePointArc((17.808378924, 25.374428862), (11.863186403, 28.640265508), (5.350005218, 30.534856217))
                ThreePointArc((5.350005218, 30.534856217), (0, 31), (-5.350005218, 30.534856217))
                ThreePointArc((-5.350005218, 30.534856217), (-11.863186403, 28.640265508), (-17.808378924, 25.374428862))
                ThreePointArc((-17.808378924, 25.374428862), (-21.920310217, 21.920310217), (-25.374428862, 17.808378924))
                ThreePointArc((-25.374428862, 17.808378924), (-28.640265508, 11.863186403), (-30.534856217, 5.350005218))
                ThreePointArc((-30.534856217, 5.350005218), (-31, 0), (-30.534856217, -5.350005218))
                ThreePointArc((-30.534856217, -5.350005218), (-28.640265508, -11.863186403), (-25.374428862, -17.808378924))
                ThreePointArc((-25.374428862, -17.808378924), (-21.920310217, -21.920310217), (-17.808378924, -25.374428862))
                ThreePointArc((-17.808378924, -25.374428862), (-11.863186403, -28.640265508), (-5.350005218, -30.534856217))
                ThreePointArc((-5.350005218, -30.534856217), (0, -31), (5.350005218, -30.534856217))
            make_face()
            with Locations(Location((0, 0, 0), (0, 0, 270))):
                Circle(SKETCH_7_R, mode=Mode.SUBTRACT)
        extrude(amount=EXTRUDE_4_DEPTH)

    # 草图8 → 切除-拉伸3 (cut, through all)
    with SkipClean():  # the faces are left unmerged after this step: merging them gives an invalid solid
        with BuildSketch(Plane.XZ):
            with Locations(Location((-13.0112367, -31.411904105, 0), (0, 0, 90))):
                Circle(SKETCH_8_R)
            with Locations(Location((13.0112367, -31.411904105, 0), (0, 0, 90))):
                Circle(SKETCH_8_R)
            with Locations(Location((31.411904105, -13.0112367, 0), (0, 0, 90))):
                Circle(SKETCH_8_R)
            with Locations(Location((-31.411904105, -13.0112367, 0), (0, 0, 90))):
                Circle(SKETCH_8_R)
            with Locations(Location((-31.411904105, 13.0112367, 0), (0, 0, 90))):
                Circle(SKETCH_8_R)
            with Locations(Location((-13.0112367, 31.411904105, 0), (0, 0, 90))):
                Circle(SKETCH_8_R)
            with Locations(Location((13.0112367, 31.411904105, 0), (0, 0, 90))):
                Circle(SKETCH_8_R)
            with Locations(Location((31.411904105, 13.0112367, 0), (0, 0, 90))):
                Circle(SKETCH_8_R)
        extrude(amount=-CUT_EXTRUDE_3_DEPTH, mode=Mode.SUBTRACT)


solid = part.part
